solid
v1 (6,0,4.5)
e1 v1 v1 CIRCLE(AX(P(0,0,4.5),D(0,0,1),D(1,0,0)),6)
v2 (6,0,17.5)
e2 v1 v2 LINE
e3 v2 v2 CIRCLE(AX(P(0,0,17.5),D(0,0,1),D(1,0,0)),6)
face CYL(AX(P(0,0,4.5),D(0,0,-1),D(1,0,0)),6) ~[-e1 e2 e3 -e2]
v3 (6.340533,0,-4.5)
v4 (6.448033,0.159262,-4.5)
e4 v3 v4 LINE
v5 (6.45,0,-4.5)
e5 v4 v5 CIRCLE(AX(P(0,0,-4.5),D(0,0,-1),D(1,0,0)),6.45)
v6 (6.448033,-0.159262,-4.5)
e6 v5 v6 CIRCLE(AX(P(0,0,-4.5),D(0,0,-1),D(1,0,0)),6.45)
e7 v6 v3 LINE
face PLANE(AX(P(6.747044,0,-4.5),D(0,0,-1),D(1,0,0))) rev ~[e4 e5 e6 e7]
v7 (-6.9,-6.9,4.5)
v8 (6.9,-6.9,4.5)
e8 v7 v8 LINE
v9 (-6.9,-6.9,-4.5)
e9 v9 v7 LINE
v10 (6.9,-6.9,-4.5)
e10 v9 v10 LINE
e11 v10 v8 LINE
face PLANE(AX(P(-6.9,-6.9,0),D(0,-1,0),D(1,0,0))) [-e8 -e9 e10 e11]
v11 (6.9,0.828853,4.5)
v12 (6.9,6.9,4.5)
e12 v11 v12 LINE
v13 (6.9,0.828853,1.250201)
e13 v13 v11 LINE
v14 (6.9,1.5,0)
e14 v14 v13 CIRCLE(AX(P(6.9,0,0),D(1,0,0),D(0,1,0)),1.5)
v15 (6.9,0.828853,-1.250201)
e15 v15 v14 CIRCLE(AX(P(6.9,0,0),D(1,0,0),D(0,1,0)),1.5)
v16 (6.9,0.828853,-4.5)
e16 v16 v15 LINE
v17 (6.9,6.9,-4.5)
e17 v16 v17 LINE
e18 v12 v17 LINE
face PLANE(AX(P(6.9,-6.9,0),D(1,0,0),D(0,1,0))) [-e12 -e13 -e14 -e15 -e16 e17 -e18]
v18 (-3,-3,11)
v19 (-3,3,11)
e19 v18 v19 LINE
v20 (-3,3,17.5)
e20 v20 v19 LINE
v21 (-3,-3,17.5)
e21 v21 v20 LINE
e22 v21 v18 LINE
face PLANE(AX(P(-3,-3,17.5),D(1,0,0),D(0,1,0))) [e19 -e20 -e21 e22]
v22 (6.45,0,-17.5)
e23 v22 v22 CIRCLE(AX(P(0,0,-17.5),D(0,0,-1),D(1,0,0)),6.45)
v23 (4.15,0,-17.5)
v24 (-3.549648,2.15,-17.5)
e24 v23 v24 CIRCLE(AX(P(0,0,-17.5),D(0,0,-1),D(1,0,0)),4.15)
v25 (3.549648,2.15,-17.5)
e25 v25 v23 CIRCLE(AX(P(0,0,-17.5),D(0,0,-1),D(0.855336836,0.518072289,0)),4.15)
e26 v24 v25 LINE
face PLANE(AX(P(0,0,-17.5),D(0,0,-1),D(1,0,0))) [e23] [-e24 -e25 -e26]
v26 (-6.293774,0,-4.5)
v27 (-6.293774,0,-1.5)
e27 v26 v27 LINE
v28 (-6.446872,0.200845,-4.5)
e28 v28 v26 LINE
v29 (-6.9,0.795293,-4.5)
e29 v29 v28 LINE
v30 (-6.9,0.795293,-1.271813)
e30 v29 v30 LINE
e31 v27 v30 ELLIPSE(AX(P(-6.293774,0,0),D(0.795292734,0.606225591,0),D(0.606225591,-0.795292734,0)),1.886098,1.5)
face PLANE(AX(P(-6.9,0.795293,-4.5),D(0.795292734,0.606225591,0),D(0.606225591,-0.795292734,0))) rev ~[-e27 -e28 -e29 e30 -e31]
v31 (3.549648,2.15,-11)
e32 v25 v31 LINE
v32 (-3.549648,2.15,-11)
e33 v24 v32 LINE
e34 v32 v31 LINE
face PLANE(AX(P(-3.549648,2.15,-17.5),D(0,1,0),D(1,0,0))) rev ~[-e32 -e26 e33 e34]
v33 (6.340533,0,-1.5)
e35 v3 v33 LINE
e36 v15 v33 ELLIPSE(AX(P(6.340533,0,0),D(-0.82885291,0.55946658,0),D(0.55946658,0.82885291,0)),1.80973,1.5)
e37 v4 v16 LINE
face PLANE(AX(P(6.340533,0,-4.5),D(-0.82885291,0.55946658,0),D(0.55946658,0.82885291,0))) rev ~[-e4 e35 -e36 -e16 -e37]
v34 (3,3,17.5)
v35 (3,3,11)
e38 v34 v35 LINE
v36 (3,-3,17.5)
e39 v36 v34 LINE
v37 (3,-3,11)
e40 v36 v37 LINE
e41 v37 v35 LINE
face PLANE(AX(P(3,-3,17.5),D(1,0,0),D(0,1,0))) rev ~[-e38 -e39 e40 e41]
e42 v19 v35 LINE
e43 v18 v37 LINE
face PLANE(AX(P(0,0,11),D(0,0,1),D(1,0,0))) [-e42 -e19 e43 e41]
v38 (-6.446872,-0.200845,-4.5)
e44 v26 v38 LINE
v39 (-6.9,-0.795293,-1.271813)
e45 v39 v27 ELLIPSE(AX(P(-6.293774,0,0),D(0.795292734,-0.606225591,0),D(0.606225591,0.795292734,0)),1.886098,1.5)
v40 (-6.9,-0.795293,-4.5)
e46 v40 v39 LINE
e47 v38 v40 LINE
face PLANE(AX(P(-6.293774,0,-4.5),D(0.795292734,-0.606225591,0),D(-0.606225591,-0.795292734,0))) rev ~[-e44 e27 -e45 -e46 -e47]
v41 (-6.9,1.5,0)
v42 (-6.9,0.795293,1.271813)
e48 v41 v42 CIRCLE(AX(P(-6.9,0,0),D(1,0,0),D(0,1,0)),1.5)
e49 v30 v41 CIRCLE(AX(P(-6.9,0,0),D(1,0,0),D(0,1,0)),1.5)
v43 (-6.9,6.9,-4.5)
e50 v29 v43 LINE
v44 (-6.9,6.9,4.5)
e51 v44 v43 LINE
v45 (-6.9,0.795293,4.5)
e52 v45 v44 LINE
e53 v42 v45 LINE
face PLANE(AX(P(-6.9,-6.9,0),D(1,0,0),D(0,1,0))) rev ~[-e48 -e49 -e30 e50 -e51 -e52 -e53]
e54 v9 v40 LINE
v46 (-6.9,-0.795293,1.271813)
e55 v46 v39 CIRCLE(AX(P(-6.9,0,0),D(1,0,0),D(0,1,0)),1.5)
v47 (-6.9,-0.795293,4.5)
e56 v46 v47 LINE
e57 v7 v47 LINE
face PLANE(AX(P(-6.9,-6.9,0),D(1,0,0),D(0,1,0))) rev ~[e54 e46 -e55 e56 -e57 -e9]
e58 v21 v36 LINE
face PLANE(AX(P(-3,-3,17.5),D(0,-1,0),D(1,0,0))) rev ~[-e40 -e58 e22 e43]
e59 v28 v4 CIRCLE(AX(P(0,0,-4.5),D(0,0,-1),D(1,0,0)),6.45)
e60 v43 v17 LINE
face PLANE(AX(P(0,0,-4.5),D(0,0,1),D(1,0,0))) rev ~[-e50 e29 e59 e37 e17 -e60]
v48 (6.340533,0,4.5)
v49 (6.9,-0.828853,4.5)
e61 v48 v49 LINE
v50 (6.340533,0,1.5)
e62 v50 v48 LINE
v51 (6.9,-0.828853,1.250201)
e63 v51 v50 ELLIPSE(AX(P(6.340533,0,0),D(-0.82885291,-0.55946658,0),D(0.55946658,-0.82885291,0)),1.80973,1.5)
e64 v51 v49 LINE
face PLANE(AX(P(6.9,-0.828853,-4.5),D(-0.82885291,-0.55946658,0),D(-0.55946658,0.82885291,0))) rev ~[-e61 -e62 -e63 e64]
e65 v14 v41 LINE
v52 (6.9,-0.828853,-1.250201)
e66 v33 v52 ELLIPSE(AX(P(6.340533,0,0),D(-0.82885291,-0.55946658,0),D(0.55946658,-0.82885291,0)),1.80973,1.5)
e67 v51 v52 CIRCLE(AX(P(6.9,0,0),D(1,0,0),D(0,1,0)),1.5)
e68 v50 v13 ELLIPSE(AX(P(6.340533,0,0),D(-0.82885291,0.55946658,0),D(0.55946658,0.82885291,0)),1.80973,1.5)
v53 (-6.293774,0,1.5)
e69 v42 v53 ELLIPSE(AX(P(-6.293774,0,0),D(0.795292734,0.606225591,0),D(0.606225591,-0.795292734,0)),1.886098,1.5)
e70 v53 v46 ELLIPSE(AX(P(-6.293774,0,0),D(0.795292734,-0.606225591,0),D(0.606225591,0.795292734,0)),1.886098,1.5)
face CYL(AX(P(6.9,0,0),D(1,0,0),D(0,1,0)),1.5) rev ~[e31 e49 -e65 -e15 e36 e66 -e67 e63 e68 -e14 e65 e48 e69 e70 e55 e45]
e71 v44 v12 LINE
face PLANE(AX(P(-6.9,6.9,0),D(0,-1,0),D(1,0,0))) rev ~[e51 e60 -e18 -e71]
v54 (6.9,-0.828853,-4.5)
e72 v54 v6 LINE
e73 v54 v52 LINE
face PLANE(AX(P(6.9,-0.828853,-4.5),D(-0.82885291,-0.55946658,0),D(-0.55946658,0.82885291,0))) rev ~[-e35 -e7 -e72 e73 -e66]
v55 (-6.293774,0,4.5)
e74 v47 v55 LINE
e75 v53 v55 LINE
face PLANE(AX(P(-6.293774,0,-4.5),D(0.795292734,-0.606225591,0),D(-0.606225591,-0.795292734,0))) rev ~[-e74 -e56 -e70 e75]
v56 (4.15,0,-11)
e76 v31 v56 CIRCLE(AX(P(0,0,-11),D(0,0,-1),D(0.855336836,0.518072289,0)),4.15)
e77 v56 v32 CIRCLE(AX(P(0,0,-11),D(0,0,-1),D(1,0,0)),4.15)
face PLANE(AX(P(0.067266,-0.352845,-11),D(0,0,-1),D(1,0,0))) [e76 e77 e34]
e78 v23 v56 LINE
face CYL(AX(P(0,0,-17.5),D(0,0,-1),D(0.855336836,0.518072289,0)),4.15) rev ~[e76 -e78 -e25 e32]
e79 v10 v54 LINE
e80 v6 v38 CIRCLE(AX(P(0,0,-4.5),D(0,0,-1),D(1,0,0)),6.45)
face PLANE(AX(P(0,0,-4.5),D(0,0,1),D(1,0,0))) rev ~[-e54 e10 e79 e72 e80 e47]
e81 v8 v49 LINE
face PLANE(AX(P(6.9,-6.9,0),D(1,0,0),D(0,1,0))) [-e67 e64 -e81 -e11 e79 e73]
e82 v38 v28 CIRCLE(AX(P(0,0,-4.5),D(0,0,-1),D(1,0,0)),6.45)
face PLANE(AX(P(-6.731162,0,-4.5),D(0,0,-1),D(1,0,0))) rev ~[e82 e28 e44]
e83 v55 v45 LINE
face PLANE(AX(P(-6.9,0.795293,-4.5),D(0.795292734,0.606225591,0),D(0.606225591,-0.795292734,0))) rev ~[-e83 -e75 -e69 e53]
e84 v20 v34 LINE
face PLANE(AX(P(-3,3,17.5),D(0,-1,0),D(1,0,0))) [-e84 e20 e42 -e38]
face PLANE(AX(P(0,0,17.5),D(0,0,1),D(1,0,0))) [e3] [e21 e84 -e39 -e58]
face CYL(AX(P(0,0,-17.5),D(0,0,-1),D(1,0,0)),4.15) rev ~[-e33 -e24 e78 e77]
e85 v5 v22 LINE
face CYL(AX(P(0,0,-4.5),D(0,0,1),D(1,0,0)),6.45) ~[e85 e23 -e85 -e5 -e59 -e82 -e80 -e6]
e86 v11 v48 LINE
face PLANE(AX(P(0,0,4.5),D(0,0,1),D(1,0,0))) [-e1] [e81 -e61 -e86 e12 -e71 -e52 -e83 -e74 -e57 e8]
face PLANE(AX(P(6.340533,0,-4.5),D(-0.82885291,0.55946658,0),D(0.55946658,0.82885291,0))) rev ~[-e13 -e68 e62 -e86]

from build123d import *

# Parameters (mm, degrees)
F0_W      = 13.8
F0_H      = 13.8
F1_DEPTH  = 4.5
F2_R      = 6
F3_DEPTH  = 13
F4_R      = 6.45
F5_DEPTH  = 13
F6_R      = 1.5
F7_DEPTH  = 13.801
F9_DEPTH  = 22.001
F10_W     = 6
F10_H     = 6
F11_DEPTH = 6.5
F13_DEPTH = 6.5


with BuildPart() as f1:
    # F0 (on Top) → F1 (new body, symmetric)
    with BuildSketch(Plane.XY):
        Rectangle(F0_W, F0_H)
    extrude(amount=F1_DEPTH, both=True)

    # F2 (on face) → F3 (join)
    with BuildSketch(Plane.XY.offset(4.5)):
        Circle(F2_R)
    extrude(amount=F3_DEPTH)

    # F4 (on face) → F5 (join)
    with BuildSketch(Plane(origin=(0, 0, -4.5), x_dir=(1, 0, 0), z_dir=(0, 0, -1))):
        Circle(F4_R)
    extrude(amount=F5_DEPTH)

    # F6 (on face) → F7 (cut, through all)
    with BuildSketch(Plane.YZ.offset(6.9)):
        Circle(F6_R)
    extrude(amount=-F7_DEPTH, mode=Mode.SUBTRACT)

    # F8 (on face) → F9 (cut, through all)
    with BuildSketch(Plane(origin=(0, 0, -4.5), x_dir=(1, 0, 0), z_dir=(0, 0, -1))):
        Polygon((6.9, 0.8288529099), (6.3405334204, 0), (6.9, -0.8288529099), align=None)
        Polygon((-6.9, -0.7952927344), (-6.2937744095, 0), (-6.9, 0.7952927344), align=None)
    extrude(amount=-F9_DEPTH, mode=Mode.SUBTRACT)

    # F10 (on face) → F11 (cut)
    with BuildSketch(Plane.XY.offset(17.5)):
        Rectangle(F10_W, F10_H)
    extrude(amount=-F11_DEPTH, mode=Mode.SUBTRACT)

    # F12 (on face) → F13 (cut)
    with BuildSketch(Plane(origin=(0, 0, -17.5), x_dir=(1, 0, 0), z_dir=(0, 0, -1))):
        with BuildLine():
            ThreePointArc((3.5496478699, -2.15), (3.9970951114, -1.1161230533), (4.15, 0))
            ThreePointArc((4.15, 0), (-1.1161230533, 3.9970951114), (-3.5496478699, -2.15))
            Line((-3.5496478699, -2.15), (0, -2.15))
            Line((0, -2.15), (3.5496478699, -2.15))
        make_face()
    extrude(amount=-F13_DEPTH, mode=Mode.SUBTRACT)


solid = f1.part
